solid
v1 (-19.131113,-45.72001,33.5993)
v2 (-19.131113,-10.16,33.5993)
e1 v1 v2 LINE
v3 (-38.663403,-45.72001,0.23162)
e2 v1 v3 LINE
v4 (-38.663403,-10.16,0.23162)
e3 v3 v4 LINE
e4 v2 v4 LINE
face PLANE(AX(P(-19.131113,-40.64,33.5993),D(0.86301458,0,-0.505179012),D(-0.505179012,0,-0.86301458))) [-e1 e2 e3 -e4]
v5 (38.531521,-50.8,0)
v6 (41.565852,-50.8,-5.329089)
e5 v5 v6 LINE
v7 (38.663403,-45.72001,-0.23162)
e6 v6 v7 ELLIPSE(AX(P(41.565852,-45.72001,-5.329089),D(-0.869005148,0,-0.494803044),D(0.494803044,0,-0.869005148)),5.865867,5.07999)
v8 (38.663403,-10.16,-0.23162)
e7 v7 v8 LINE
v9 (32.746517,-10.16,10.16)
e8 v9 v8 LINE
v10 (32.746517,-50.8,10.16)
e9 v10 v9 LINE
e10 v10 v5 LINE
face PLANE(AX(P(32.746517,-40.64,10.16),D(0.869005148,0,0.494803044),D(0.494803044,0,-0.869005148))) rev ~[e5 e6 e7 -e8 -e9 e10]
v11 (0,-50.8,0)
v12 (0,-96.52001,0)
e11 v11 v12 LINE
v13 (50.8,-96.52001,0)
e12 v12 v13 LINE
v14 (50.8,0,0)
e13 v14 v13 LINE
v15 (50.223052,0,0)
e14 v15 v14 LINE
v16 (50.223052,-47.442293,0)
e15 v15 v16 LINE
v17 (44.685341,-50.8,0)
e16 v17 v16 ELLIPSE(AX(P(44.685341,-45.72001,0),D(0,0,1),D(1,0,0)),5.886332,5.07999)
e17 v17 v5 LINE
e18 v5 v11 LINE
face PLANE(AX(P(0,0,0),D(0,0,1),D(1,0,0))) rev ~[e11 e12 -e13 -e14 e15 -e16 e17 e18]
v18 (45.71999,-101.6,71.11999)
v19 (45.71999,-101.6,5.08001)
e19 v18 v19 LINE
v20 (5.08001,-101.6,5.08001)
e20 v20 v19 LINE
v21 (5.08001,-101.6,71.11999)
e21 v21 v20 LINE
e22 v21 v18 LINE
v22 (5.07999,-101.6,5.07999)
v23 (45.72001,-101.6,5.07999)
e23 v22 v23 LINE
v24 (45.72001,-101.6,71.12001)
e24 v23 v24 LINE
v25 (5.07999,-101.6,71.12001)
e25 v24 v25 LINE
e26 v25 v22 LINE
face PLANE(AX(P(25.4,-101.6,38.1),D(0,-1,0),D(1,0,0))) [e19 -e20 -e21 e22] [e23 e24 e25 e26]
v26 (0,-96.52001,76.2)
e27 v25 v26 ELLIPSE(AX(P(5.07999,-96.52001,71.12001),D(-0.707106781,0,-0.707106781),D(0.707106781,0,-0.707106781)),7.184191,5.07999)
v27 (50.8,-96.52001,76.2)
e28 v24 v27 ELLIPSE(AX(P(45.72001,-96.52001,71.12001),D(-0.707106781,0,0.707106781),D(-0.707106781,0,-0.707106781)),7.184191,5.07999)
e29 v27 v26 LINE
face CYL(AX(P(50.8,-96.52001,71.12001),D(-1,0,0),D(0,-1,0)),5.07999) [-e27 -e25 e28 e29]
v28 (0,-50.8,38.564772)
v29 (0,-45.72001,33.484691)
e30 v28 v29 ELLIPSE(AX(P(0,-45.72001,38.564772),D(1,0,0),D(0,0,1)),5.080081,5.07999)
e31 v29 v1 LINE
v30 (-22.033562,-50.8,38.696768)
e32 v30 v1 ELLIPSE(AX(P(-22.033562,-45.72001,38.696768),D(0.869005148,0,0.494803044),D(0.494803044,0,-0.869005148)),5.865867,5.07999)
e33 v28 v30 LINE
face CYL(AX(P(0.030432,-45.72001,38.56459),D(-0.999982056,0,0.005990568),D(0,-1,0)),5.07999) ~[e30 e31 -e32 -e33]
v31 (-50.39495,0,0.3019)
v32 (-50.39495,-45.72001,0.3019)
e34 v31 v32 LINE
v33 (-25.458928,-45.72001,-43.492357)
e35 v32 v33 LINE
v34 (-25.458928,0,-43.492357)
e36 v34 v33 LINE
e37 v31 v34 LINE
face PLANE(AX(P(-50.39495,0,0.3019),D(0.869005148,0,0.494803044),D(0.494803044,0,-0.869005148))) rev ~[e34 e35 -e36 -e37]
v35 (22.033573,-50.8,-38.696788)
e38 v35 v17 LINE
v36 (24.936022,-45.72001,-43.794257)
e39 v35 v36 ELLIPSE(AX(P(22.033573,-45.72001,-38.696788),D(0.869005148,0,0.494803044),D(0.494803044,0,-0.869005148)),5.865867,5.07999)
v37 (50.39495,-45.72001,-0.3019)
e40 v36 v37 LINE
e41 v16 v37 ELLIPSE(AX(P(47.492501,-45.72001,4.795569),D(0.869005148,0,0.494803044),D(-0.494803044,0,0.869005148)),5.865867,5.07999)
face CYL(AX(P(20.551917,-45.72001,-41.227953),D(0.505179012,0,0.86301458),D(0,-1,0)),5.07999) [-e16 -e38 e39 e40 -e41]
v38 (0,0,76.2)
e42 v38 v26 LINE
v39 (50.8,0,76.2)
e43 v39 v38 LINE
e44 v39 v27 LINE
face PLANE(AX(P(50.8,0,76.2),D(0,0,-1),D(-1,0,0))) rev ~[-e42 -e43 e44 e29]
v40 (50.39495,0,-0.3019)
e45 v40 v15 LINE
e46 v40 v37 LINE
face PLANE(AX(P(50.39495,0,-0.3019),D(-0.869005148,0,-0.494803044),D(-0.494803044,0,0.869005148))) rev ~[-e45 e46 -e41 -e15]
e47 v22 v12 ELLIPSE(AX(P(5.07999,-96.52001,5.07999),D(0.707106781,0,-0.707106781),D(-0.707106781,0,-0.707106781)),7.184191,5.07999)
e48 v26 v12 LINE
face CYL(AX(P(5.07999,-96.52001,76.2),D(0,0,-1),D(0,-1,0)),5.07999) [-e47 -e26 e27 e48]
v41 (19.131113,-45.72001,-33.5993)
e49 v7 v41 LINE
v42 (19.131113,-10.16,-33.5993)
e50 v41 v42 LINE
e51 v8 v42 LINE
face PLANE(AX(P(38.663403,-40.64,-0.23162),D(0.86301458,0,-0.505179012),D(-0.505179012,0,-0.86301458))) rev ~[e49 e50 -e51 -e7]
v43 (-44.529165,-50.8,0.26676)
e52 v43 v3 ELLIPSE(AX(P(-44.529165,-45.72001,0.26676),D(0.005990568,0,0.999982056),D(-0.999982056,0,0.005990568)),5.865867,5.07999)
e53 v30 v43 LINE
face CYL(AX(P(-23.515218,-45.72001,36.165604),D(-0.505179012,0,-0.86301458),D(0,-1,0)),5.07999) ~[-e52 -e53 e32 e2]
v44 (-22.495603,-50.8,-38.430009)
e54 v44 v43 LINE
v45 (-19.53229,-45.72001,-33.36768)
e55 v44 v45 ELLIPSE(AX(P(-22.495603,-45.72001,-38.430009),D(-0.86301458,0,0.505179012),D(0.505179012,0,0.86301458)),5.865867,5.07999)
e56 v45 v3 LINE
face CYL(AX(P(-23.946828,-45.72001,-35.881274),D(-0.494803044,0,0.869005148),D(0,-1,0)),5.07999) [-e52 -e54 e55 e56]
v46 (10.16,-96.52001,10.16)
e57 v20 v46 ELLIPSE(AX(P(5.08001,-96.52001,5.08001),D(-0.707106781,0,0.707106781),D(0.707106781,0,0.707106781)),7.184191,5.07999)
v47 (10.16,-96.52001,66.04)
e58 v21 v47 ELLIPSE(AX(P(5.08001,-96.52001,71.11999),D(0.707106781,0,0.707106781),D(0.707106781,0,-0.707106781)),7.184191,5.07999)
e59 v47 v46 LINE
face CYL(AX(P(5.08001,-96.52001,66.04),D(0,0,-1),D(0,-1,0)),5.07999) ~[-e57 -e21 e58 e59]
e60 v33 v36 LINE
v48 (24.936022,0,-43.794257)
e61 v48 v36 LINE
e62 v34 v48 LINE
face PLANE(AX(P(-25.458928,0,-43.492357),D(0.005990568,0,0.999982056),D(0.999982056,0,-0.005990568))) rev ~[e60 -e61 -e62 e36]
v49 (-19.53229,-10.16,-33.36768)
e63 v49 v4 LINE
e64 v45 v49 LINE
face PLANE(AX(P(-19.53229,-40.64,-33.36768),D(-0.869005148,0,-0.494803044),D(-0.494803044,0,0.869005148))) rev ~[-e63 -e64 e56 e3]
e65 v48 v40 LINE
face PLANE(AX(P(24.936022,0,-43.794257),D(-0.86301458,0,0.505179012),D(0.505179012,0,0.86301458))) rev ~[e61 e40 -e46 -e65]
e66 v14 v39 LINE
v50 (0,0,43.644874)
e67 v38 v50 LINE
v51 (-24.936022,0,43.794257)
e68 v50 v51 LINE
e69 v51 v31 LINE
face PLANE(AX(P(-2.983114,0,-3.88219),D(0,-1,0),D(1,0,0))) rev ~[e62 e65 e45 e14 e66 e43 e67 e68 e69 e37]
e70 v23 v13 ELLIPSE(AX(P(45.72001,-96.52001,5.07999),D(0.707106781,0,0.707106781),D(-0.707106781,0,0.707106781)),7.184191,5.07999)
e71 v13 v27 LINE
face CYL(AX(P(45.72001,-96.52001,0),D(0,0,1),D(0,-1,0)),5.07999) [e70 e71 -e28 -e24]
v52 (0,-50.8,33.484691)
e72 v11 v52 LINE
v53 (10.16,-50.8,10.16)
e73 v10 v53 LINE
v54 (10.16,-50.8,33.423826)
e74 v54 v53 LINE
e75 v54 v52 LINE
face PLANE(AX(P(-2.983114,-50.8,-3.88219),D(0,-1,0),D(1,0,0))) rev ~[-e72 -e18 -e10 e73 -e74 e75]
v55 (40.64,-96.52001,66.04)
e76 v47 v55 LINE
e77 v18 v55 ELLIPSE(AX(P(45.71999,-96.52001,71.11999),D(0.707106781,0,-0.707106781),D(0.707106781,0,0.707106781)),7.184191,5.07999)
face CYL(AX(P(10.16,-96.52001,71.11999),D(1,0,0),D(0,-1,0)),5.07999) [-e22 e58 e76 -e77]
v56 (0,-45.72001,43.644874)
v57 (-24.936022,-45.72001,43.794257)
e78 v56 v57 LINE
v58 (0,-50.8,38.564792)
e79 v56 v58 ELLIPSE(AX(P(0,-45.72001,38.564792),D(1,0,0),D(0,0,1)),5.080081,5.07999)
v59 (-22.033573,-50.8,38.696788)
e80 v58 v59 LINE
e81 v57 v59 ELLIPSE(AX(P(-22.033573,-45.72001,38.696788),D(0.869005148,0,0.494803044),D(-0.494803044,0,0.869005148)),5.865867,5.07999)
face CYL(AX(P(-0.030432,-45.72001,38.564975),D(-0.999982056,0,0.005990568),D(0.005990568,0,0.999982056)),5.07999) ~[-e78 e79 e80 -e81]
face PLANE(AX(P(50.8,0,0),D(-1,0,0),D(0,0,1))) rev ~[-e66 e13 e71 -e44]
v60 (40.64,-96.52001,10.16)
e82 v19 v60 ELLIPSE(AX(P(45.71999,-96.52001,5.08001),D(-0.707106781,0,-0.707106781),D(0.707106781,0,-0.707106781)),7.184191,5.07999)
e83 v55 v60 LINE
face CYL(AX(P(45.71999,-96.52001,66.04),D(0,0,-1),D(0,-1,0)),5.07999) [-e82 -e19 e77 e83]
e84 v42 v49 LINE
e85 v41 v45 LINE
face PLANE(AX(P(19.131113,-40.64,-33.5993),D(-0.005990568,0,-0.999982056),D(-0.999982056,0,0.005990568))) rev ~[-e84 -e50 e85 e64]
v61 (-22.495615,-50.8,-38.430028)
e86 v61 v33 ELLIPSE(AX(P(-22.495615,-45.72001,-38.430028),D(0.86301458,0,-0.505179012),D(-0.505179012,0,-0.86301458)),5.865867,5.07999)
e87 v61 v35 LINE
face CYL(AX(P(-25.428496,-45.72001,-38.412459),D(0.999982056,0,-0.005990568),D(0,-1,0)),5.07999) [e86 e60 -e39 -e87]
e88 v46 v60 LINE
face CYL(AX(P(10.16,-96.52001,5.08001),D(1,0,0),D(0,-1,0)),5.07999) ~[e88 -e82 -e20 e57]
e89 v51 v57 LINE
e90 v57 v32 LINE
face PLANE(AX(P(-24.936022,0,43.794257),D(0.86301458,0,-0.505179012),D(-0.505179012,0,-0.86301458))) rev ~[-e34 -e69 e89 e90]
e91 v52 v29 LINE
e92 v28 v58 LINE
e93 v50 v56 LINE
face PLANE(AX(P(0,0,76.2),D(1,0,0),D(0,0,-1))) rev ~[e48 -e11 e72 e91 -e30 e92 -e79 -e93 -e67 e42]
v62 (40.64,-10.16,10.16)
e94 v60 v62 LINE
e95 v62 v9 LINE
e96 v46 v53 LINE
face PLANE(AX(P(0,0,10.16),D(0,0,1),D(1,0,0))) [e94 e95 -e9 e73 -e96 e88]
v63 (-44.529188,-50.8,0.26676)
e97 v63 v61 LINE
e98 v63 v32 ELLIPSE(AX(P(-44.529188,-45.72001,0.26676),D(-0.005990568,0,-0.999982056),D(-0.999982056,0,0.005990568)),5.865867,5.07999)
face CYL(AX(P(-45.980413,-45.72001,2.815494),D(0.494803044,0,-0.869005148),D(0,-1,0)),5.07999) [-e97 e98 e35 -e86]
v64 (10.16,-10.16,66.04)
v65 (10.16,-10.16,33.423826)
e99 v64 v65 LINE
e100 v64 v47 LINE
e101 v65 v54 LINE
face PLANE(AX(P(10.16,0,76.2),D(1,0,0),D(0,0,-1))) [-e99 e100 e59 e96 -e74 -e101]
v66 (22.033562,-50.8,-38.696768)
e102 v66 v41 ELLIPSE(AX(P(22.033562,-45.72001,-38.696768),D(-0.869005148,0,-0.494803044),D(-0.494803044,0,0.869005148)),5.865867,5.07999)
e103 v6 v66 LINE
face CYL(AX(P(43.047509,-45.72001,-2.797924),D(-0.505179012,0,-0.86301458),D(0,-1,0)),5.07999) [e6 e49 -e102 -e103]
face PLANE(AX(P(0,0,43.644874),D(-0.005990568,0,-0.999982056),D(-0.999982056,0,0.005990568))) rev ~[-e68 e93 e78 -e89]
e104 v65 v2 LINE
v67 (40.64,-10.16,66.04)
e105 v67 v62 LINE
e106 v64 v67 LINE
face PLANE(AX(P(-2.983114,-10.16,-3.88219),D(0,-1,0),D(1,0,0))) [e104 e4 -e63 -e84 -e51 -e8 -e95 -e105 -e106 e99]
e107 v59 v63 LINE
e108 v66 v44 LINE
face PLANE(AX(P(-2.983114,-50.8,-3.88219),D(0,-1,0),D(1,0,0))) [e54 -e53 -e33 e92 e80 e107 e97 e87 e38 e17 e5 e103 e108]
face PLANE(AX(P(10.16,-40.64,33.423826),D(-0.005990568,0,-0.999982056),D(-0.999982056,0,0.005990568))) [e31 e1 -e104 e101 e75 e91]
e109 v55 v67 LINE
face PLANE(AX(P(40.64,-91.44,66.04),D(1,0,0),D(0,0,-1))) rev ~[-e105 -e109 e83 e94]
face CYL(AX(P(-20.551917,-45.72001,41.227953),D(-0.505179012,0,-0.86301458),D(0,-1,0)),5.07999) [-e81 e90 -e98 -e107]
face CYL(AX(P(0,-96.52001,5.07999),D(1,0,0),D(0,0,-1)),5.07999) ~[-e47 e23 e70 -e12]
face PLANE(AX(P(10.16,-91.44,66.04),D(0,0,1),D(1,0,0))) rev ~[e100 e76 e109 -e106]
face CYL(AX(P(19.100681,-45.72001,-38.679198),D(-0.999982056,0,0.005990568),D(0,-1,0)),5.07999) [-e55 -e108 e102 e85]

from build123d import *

# Parameters (mm, degrees)
F1_DEPTH = 101.6
F2_DEPTH = 50.8
F3_T     = -10.16
F4_R     = 5.07999


# Not quite as in the source:
# - a fillet or chamfer is up to 0.001 mm smaller than in the source, because OpenCascade refuses the exact size


with BuildPart() as f1:
    # F0 (on Front) → F1 (new body)
    with BuildSketch(Plane.XZ):
        Polygon((0, 43.6448735309), (0, 0), (50.223051581, 0), (50.8, 0), (50.8, 76.2), (0, 76.2), align=None)
    extrude(amount=F1_DEPTH)

    # F0 (on Front) → F2 (join)
    with BuildSketch(Plane.XZ):
        Polygon((50.223051581, 0), (0, 0), (0, 43.6448735309), (-24.9360222917, 43.7942571525), (-50.3949503798, 0.3018998023), (-25.4589280881, -43.4923573502), (24.9360222917, -43.7942571525), (50.3949503798, -0.3018998023), align=None)
    extrude(amount=F2_DEPTH)

    # F3: a shell. OpenCascade refuses it in one call, so the cavity is built on its own and cut out:
    # the body offset inwards by the wall thickness, plus a prism from it out through each open face.
    f3_core = offset(f1.part, amount=F3_T, kind=Kind.INTERSECTION, mode=Mode.PRIVATE)
    f3_exits = [f3_core.faces().sort_by_distance(p)[0] for p in [
        (25.4, -91.44, 38.1),
        (-1.965126, -40.64, -2.131269),
    ]]
    add(f3_core, mode=Mode.SUBTRACT)
    extrude(f3_exits, amount=-F3_T, mode=Mode.SUBTRACT)

    # F4 (radius 5.08 in the source; OpenCascade refuses exactly that, so slightly less here)
    f4_edges = [f1.edges().sort_by_distance(p)[0] for p in [
        (25.4, -101.6, 66.04),
        (40.64, -101.6, 38.1),
        (25.4, -101.6, 10.16),
        (10.16, -101.6, 38.1),
        (-28.897258, -50.8, 16.91546),
        (-29.097847, -50.8, -16.56803),
        (-0.200589, -50.8, -33.48349),
        (28.897258, -50.8, -16.91546),
        (-12.468011, -50.8, 43.719565),
        (-37.665486, -50.8, 22.048078),
        (-37.926939, -50.8, -21.595229),
        (-0.261453, -50.8, -43.643307),
        (37.665486, -50.8, -22.048078),
        (0, -101.6, 38.1),
        (25.4, -101.6, 76.2),
        (50.8, -101.6, 38.1),
        (25.4, -101.6, 0),
        (-9.565556, -50.8, 33.541995),
    ]]
    fillet(f4_edges, radius=F4_R)


solid = f1.part
